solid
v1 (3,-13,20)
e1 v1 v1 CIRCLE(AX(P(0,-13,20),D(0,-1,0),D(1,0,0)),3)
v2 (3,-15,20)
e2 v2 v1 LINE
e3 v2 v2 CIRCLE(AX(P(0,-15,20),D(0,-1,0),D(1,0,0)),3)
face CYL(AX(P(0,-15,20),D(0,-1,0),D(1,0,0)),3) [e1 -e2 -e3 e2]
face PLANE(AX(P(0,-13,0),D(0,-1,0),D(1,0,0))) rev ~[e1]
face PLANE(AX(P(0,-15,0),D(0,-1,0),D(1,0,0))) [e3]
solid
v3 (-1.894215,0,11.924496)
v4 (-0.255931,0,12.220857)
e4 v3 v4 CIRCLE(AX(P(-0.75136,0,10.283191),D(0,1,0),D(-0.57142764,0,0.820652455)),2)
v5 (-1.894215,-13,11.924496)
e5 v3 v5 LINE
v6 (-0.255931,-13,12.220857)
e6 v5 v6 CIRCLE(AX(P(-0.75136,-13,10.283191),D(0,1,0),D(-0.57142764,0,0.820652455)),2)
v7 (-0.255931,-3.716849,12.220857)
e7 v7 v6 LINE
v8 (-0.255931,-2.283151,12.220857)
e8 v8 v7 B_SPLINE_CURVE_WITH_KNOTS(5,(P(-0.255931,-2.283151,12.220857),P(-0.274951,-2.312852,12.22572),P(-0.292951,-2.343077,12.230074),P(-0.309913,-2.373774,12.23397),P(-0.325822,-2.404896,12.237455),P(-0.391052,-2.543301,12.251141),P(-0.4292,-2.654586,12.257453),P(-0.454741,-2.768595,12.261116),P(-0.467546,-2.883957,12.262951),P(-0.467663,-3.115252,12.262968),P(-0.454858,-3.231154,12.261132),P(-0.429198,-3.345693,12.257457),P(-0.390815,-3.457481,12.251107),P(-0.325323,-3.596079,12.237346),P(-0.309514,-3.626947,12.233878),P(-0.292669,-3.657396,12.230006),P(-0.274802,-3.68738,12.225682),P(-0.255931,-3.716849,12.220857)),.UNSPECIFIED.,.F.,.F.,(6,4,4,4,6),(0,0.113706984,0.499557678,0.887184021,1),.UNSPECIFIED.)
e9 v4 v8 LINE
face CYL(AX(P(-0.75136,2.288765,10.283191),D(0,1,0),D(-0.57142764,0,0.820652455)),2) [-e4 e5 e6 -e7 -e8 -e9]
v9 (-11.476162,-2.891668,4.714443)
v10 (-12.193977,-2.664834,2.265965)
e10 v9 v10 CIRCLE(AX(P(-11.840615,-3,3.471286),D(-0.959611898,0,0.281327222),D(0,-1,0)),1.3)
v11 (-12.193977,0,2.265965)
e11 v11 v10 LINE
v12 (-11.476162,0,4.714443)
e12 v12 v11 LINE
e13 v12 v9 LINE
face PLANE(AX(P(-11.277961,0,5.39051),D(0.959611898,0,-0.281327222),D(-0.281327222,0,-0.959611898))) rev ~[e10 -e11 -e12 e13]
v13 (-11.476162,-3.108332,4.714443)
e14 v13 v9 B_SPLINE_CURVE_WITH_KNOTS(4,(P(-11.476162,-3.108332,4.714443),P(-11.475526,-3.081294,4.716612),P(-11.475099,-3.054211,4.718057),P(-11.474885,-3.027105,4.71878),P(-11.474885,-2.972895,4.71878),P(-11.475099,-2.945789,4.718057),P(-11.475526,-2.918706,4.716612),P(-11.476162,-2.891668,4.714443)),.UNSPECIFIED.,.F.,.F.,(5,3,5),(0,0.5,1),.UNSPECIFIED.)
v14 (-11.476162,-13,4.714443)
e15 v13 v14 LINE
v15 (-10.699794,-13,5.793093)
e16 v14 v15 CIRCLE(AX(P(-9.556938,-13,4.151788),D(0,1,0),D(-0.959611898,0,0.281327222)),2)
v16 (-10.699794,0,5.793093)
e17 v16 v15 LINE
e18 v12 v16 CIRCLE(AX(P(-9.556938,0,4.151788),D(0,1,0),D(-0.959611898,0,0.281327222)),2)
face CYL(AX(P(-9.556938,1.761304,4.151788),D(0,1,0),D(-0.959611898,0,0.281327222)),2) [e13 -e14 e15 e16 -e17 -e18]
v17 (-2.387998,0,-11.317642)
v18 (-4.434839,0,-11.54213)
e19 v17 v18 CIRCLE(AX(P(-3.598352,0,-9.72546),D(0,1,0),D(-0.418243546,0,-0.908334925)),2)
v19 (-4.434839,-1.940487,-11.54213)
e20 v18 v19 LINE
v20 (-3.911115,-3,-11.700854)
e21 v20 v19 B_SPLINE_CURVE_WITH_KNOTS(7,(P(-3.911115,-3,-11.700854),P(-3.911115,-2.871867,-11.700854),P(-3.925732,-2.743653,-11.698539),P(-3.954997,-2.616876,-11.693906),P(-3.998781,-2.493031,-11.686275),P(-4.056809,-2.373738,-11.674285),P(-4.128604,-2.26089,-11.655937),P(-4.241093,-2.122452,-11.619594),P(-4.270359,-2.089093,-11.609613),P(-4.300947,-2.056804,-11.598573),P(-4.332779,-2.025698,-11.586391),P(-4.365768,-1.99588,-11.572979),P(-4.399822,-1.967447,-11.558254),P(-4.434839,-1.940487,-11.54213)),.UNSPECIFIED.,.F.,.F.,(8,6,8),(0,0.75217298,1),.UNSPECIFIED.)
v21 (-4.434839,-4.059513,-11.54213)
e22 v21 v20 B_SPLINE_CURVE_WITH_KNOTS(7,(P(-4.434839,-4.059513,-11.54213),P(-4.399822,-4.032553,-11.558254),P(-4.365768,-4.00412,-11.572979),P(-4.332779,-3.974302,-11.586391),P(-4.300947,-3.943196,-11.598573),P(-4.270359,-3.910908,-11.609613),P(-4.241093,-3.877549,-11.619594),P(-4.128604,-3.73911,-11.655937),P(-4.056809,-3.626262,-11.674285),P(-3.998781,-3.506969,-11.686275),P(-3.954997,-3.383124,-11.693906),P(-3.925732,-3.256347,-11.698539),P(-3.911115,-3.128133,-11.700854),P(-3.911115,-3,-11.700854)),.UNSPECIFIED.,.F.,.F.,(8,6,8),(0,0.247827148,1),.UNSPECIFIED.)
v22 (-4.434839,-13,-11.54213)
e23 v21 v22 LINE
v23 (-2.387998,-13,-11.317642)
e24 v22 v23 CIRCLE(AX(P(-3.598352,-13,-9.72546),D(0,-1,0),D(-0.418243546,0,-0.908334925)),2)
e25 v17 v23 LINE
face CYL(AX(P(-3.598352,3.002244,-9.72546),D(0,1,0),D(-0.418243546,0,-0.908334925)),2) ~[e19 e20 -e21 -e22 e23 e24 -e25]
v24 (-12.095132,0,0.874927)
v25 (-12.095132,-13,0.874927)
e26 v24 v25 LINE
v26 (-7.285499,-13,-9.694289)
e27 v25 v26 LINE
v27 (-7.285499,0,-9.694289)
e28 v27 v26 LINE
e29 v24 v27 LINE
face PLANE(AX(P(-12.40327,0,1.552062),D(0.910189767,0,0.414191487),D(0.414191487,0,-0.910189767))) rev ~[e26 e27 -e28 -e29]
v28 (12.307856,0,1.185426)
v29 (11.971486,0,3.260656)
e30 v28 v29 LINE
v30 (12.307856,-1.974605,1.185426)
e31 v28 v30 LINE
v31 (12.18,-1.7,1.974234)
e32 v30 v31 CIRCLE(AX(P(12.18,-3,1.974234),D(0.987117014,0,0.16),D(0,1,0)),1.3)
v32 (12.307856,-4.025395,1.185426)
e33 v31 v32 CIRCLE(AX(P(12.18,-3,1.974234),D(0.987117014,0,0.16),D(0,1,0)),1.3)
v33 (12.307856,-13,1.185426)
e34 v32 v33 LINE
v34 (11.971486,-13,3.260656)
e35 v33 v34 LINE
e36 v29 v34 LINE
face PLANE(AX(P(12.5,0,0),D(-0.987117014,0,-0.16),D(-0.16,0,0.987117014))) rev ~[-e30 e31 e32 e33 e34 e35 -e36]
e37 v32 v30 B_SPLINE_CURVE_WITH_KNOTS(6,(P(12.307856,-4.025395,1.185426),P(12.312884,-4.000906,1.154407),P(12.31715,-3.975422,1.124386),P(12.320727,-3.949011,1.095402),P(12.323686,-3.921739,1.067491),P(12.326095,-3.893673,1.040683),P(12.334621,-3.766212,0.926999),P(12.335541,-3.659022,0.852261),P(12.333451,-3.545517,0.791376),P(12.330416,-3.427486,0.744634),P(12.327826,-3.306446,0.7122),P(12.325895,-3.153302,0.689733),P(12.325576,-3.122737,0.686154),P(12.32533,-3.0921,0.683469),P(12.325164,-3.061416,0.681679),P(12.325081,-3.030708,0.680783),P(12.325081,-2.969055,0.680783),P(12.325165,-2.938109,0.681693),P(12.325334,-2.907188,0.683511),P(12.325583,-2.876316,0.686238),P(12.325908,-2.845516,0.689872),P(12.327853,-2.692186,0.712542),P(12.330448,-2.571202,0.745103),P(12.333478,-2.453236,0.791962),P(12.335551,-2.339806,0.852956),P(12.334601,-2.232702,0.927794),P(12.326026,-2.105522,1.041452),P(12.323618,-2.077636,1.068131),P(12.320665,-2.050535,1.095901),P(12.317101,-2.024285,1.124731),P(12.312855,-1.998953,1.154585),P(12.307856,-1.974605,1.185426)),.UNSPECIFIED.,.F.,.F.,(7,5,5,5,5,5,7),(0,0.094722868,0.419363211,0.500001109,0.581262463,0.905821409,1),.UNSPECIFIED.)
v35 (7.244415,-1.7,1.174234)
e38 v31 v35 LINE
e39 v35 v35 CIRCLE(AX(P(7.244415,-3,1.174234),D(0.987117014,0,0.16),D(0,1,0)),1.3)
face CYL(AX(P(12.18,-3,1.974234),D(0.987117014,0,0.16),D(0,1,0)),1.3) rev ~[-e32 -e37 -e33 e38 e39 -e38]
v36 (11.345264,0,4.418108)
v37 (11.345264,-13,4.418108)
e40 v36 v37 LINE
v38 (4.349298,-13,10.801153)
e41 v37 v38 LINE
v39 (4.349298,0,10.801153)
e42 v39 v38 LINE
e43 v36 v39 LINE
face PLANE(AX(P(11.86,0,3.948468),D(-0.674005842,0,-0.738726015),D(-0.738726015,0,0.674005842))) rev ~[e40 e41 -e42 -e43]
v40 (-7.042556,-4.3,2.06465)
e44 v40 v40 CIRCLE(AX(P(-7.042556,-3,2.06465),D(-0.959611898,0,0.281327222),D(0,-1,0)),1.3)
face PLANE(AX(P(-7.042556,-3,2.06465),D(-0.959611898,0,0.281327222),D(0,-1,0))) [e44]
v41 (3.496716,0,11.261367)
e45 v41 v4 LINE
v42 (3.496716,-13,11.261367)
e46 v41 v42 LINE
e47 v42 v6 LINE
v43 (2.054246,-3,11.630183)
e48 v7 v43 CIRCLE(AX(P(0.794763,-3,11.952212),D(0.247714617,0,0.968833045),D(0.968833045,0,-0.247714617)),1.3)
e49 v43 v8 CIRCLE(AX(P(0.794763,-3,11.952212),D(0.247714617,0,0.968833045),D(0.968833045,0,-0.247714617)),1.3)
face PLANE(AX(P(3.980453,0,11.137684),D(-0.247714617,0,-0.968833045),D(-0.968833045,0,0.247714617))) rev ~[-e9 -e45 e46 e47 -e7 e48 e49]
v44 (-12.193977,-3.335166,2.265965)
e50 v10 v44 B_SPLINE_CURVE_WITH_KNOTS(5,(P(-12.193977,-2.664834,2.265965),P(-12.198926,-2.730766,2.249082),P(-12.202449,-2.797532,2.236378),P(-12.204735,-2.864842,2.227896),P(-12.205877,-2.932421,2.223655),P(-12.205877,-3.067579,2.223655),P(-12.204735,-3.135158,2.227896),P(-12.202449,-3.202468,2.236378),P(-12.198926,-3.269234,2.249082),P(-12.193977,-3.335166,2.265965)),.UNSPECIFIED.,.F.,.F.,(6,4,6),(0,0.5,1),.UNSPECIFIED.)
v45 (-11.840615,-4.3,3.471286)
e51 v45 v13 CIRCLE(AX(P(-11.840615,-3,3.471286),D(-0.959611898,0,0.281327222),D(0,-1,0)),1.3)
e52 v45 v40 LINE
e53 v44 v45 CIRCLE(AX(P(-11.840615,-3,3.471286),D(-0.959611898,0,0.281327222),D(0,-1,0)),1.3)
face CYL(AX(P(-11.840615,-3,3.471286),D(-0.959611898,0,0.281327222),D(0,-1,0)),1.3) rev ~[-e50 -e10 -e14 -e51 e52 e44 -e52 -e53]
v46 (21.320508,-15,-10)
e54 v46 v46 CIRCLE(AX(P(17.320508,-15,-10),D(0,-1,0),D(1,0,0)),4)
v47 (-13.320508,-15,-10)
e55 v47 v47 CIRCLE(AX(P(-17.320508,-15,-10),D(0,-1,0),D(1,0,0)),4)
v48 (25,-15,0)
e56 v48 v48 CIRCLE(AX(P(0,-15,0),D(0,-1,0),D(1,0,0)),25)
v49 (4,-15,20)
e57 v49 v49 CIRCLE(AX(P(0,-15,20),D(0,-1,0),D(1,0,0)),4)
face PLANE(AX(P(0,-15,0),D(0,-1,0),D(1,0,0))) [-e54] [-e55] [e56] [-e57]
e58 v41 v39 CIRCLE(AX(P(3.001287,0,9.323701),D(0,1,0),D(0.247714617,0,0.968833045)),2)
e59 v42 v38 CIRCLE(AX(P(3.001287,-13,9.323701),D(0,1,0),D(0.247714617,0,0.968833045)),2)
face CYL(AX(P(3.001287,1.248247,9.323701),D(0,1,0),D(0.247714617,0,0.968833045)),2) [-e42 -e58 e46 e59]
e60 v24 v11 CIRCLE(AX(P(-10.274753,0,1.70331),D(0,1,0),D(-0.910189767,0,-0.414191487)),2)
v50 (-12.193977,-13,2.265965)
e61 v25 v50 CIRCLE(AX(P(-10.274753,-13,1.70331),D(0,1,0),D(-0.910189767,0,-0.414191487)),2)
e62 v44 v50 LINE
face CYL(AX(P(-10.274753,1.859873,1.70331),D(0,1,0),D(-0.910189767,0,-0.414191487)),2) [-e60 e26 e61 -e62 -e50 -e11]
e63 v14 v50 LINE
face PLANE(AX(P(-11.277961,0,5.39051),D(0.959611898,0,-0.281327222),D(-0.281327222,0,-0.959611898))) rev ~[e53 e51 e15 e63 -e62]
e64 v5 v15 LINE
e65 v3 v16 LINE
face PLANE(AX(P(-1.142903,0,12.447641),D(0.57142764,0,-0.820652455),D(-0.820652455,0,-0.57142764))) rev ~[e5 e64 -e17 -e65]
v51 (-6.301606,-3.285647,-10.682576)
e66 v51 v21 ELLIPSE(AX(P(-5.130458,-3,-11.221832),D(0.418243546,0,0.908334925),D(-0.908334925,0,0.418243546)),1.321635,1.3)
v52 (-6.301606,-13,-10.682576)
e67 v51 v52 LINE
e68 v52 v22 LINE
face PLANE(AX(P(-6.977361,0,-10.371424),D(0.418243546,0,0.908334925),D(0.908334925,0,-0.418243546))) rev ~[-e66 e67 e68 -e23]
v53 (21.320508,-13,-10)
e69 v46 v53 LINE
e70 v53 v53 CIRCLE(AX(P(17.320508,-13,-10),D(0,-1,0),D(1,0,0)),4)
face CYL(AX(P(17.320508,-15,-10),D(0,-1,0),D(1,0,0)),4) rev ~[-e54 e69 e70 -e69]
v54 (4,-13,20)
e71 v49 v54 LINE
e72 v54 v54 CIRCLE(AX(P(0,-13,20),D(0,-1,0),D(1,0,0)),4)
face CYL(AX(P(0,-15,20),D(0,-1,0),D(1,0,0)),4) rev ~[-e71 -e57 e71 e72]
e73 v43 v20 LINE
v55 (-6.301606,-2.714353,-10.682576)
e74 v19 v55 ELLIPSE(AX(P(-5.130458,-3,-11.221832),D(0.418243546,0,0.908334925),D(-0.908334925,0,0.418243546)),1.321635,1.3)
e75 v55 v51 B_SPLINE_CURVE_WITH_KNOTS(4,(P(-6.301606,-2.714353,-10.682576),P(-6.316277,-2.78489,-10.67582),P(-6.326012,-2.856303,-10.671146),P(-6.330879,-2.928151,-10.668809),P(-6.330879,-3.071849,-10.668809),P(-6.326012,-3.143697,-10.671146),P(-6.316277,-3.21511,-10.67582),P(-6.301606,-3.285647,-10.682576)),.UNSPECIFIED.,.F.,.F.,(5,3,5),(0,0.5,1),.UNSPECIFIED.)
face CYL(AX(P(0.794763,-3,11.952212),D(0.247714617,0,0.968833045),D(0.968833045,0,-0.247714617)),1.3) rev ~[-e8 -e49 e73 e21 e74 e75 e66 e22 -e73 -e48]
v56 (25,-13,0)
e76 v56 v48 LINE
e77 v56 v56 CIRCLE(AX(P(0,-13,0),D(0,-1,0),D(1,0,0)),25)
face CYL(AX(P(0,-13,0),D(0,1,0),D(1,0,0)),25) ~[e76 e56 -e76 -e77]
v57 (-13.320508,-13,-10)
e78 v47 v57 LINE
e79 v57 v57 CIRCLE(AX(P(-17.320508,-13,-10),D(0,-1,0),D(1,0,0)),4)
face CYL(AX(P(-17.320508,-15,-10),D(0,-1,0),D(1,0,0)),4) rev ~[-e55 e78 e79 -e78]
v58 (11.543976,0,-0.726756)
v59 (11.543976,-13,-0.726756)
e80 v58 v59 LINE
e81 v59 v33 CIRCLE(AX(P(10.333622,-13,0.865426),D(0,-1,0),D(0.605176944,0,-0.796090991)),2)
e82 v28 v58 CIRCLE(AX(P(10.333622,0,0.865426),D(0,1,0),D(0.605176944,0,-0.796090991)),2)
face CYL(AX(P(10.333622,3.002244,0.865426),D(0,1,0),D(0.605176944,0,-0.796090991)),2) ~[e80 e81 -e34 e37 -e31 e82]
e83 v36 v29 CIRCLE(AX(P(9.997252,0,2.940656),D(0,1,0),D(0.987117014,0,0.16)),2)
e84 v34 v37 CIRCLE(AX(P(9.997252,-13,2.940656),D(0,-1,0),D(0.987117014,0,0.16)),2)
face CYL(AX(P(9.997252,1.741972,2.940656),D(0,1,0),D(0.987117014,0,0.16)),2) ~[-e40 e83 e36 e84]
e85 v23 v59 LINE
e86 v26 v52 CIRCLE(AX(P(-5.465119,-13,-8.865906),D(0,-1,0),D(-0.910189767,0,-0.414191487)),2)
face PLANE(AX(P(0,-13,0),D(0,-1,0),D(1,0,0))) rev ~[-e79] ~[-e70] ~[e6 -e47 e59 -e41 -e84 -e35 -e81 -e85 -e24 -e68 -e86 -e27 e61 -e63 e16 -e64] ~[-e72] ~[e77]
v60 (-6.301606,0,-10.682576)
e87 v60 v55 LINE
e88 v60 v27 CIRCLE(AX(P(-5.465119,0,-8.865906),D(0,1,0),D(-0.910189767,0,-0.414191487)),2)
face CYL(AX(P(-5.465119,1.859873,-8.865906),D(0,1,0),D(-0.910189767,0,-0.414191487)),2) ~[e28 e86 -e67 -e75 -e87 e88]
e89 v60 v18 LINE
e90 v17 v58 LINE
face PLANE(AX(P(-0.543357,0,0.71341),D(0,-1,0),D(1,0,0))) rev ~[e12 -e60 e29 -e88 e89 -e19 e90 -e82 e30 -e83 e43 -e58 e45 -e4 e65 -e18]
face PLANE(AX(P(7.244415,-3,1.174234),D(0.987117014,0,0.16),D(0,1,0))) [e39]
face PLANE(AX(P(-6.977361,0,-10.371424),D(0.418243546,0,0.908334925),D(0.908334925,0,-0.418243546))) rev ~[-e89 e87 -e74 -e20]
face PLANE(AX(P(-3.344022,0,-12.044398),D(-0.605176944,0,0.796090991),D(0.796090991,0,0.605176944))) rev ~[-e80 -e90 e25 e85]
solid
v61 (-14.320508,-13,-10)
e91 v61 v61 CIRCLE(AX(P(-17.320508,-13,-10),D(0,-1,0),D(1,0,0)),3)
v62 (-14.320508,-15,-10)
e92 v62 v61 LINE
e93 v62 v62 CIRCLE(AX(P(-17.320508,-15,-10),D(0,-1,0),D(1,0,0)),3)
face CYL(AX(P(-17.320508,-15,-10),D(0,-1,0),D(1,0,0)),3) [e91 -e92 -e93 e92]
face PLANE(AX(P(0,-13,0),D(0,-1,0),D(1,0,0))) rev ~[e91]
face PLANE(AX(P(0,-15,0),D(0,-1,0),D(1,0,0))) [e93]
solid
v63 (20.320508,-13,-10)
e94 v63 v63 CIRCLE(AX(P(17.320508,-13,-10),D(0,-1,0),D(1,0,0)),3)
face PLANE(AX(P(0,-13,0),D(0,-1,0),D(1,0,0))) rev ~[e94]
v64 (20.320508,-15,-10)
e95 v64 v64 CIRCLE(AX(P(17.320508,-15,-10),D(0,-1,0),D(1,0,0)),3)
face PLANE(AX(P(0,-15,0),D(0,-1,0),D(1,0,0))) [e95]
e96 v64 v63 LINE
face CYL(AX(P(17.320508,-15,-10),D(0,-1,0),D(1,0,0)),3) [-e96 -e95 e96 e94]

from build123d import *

# Parameters (mm, degrees)
F1_DEPTH      = 13
F2_R          = 1.3
F3_DEPTH      = 5
F4_R          = 1.3
F5_DEPTH      = 25
F6_R          = 1.3
F7_DEPTH      = 5
F8_R          = 25
F9_DEPTH      = 2
F10_R         = 4
F10_R_2       = 3
F11_DEPTH     = 80
F12_T1_DEPTH  = 16.002243982
F12_T3_DEPTH  = 14.8598729542
F12_T5_DEPTH  = 14.7613040686
F12_T7_DEPTH  = 15.2887647241
F12_T9_DEPTH  = 14.7419723435
F12_T11_DEPTH = 14.2482473807


# Not quite as in the source:
# - a fillet or chamfer that OpenCascade refuses, or shapes differently, is made with other operations: its cross-section is extruded or revolved along the edge and cut away or added


with BuildPart() as f1:
    # F0 (on Front) → F1 (new body)
    with BuildSketch(Plane.XZ):
        Polygon((-3.34402165, -12.0443978349), (12.5, 0), (11.86, 3.9484680574), (3.9804532583, 11.1376835822), (-1.1429031284, 12.44764124), (-11.2779609495, 5.390509885), (-12.4032698364, 1.552062294), (-6.9773613512, -10.3714236522), align=None)
    extrude(amount=F1_DEPTH)

    # F2 (on face) → F3 (cut)
    with BuildSketch(Plane(origin=(12.18, 0, 1.9742340287), x_dir=(0, 1, 0), z_dir=(0.9871170143, 0, 0.16))):
        with Locations((-3, 0)):
            Circle(F2_R)
    extrude(amount=-F3_DEPTH, mode=Mode.SUBTRACT)

    # F4 (on face) → F5 (cut)
    with BuildSketch(Plane(origin=(2.9172291114, 0, 11.4095324461), x_dir=(0.9688330447, 0, -0.2477146172), z_dir=(0.2477146172, 0, 0.9688330447))):
        with Locations((-2.1907450021, -3)):
            Circle(F4_R)
    extrude(amount=-F5_DEPTH, mode=Mode.SUBTRACT)

    # F6 (on face) → F7 (cut)
    with BuildSketch(Plane(origin=(-11.840615393, 0, 3.4712860895), x_dir=(0, -1, 0), z_dir=(-0.9596118978, 0, 0.2813272217))):
        with Locations((3, 0)):
            Circle(F6_R)
    extrude(amount=-F7_DEPTH, mode=Mode.SUBTRACT)

    # F8 (on face) → F9 (join)
    with BuildSketch(Plane.XZ.offset(13)):
        Circle(F8_R)
    extrude(amount=F9_DEPTH)

    # F10 (on face) → F11 (cut)
    with BuildSketch(Plane.XZ.offset(15)):
        with Locations((0, 20)):
            Circle(F10_R)
        with Locations((0, 20)):
            Circle(F10_R_2, mode=Mode.SUBTRACT)
        with Locations((17.3205080757, -10)):
            Circle(F10_R)
        with Locations((17.3205080757, -10)):
            Circle(F10_R_2, mode=Mode.SUBTRACT)
        with Locations((-17.3205080757, -10)):
            Circle(F10_R)
        with Locations((-17.3205080757, -10)):
            Circle(F10_R_2, mode=Mode.SUBTRACT)
    extrude(amount=-F11_DEPTH, mode=Mode.SUBTRACT)

    # F12: fillet of radius 2 on 8 edges, made by hand

    # F12_s2 → F12_t1 (cut)
    with BuildSketch(Plane.XZ.offset(-3.002243982)):
        with BuildLine():
            ThreePointArc((-4.4348388753, -11.5421301677), (-3.3803086774, -11.7135390891), (-2.3879978952, -11.3176422991))
            Line((-2.3879978952, -11.3176422991), (-3.34402165, -12.0443978349))
            Line((-3.34402165, -12.0443978349), (-4.4348388753, -11.5421301677))
        make_face()
        with BuildLine():
            ThreePointArc((11.5439762452, -0.7267555357), (12.1909080195, 0.1234763362), (12.3078563852, 1.1854264463))
            Line((12.3078563852, 1.1854264463), (12.5, 0))
            Line((12.5, 0), (11.5439762452, -0.7267555357))
        make_face()
    extrude(amount=F12_T1_DEPTH, mode=Mode.SUBTRACT)

    # F12_s4 → F12_t3 (cut)
    with BuildSketch(Plane.XZ.offset(-1.8598729542)):
        with BuildLine():
            ThreePointArc((-7.2854987693, -9.69428872), (-6.8824804468, -10.2769646373), (-6.3016063269, -10.6825755958))
            Line((-6.3016063269, -10.6825755958), (-6.9773613512, -10.3714236522))
            Line((-6.9773613512, -10.3714236522), (-7.2854987693, -9.69428872))
        make_face()
        with BuildLine():
            ThreePointArc((-12.0951324183, 0.8749273617), (-12.2697226938, 1.5615518796), (-12.1939766801, 2.26596478))
            Line((-12.1939766801, 2.26596478), (-12.4032698364, 1.552062294))
            Line((-12.4032698364, 1.552062294), (-12.0951324183, 0.8749273617))
        make_face()
    extrude(amount=F12_T3_DEPTH, mode=Mode.SUBTRACT)

    # F12_s6 → F12_t5 (cut)
    with BuildSketch(Plane.XZ.offset(-1.7613040686)):
        with BuildLine():
            ThreePointArc((-11.4761620616, 4.7144425491), (-11.1801923355, 5.320140033), (-10.6997935463, 5.793093016))
            Line((-10.6997935463, 5.793093016), (-11.2779609495, 5.390509885))
            Line((-11.2779609495, 5.390509885), (-11.4761620616, 4.7144425491))
        make_face()
    extrude(amount=F12_T5_DEPTH, mode=Mode.SUBTRACT)

    # F12_s8 → F12_t7 (cut)
    with BuildSketch(Plane.XZ.offset(-2.2887647241)):
        with BuildLine():
            ThreePointArc((-1.8942152844, 11.92449587), (-1.1073763077, 12.2512489852), (-0.2559307699, 12.220857049))
            Line((-0.2559307699, 12.220857049), (-1.1429031284, 12.44764124))
            Line((-1.1429031284, 12.44764124), (-1.8942152844, 11.92449587))
        make_face()
    extrude(amount=F12_T7_DEPTH, mode=Mode.SUBTRACT)

    # F12_s10 → F12_t9 (cut)
    with BuildSketch(Plane.XZ.offset(-1.7419723435)):
        with BuildLine():
            ThreePointArc((11.97148623, 3.2606558419), (11.7563010761, 3.8923632844), (11.345263885, 4.4181078717))
            Line((11.345263885, 4.4181078717), (11.86, 3.9484680574))
            Line((11.86, 3.9484680574), (11.97148623, 3.2606558419))
        make_face()
    extrude(amount=F12_T9_DEPTH, mode=Mode.SUBTRACT)

    # F12_s12 → F12_t11 (cut)
    with BuildSketch(Plane.XZ.offset(-1.2482473807)):
        with BuildLine():
            ThreePointArc((3.4967159342, 11.261367231), (3.9512960944, 11.0836676613), (4.3492983836, 10.8011531715))
            Line((4.3492983836, 10.8011531715), (3.9804532583, 11.1376835822))
            Line((3.9804532583, 11.1376835822), (3.4967159342, 11.261367231))
        make_face()
    extrude(amount=F12_T11_DEPTH, mode=Mode.SUBTRACT)


solid = f1.part
